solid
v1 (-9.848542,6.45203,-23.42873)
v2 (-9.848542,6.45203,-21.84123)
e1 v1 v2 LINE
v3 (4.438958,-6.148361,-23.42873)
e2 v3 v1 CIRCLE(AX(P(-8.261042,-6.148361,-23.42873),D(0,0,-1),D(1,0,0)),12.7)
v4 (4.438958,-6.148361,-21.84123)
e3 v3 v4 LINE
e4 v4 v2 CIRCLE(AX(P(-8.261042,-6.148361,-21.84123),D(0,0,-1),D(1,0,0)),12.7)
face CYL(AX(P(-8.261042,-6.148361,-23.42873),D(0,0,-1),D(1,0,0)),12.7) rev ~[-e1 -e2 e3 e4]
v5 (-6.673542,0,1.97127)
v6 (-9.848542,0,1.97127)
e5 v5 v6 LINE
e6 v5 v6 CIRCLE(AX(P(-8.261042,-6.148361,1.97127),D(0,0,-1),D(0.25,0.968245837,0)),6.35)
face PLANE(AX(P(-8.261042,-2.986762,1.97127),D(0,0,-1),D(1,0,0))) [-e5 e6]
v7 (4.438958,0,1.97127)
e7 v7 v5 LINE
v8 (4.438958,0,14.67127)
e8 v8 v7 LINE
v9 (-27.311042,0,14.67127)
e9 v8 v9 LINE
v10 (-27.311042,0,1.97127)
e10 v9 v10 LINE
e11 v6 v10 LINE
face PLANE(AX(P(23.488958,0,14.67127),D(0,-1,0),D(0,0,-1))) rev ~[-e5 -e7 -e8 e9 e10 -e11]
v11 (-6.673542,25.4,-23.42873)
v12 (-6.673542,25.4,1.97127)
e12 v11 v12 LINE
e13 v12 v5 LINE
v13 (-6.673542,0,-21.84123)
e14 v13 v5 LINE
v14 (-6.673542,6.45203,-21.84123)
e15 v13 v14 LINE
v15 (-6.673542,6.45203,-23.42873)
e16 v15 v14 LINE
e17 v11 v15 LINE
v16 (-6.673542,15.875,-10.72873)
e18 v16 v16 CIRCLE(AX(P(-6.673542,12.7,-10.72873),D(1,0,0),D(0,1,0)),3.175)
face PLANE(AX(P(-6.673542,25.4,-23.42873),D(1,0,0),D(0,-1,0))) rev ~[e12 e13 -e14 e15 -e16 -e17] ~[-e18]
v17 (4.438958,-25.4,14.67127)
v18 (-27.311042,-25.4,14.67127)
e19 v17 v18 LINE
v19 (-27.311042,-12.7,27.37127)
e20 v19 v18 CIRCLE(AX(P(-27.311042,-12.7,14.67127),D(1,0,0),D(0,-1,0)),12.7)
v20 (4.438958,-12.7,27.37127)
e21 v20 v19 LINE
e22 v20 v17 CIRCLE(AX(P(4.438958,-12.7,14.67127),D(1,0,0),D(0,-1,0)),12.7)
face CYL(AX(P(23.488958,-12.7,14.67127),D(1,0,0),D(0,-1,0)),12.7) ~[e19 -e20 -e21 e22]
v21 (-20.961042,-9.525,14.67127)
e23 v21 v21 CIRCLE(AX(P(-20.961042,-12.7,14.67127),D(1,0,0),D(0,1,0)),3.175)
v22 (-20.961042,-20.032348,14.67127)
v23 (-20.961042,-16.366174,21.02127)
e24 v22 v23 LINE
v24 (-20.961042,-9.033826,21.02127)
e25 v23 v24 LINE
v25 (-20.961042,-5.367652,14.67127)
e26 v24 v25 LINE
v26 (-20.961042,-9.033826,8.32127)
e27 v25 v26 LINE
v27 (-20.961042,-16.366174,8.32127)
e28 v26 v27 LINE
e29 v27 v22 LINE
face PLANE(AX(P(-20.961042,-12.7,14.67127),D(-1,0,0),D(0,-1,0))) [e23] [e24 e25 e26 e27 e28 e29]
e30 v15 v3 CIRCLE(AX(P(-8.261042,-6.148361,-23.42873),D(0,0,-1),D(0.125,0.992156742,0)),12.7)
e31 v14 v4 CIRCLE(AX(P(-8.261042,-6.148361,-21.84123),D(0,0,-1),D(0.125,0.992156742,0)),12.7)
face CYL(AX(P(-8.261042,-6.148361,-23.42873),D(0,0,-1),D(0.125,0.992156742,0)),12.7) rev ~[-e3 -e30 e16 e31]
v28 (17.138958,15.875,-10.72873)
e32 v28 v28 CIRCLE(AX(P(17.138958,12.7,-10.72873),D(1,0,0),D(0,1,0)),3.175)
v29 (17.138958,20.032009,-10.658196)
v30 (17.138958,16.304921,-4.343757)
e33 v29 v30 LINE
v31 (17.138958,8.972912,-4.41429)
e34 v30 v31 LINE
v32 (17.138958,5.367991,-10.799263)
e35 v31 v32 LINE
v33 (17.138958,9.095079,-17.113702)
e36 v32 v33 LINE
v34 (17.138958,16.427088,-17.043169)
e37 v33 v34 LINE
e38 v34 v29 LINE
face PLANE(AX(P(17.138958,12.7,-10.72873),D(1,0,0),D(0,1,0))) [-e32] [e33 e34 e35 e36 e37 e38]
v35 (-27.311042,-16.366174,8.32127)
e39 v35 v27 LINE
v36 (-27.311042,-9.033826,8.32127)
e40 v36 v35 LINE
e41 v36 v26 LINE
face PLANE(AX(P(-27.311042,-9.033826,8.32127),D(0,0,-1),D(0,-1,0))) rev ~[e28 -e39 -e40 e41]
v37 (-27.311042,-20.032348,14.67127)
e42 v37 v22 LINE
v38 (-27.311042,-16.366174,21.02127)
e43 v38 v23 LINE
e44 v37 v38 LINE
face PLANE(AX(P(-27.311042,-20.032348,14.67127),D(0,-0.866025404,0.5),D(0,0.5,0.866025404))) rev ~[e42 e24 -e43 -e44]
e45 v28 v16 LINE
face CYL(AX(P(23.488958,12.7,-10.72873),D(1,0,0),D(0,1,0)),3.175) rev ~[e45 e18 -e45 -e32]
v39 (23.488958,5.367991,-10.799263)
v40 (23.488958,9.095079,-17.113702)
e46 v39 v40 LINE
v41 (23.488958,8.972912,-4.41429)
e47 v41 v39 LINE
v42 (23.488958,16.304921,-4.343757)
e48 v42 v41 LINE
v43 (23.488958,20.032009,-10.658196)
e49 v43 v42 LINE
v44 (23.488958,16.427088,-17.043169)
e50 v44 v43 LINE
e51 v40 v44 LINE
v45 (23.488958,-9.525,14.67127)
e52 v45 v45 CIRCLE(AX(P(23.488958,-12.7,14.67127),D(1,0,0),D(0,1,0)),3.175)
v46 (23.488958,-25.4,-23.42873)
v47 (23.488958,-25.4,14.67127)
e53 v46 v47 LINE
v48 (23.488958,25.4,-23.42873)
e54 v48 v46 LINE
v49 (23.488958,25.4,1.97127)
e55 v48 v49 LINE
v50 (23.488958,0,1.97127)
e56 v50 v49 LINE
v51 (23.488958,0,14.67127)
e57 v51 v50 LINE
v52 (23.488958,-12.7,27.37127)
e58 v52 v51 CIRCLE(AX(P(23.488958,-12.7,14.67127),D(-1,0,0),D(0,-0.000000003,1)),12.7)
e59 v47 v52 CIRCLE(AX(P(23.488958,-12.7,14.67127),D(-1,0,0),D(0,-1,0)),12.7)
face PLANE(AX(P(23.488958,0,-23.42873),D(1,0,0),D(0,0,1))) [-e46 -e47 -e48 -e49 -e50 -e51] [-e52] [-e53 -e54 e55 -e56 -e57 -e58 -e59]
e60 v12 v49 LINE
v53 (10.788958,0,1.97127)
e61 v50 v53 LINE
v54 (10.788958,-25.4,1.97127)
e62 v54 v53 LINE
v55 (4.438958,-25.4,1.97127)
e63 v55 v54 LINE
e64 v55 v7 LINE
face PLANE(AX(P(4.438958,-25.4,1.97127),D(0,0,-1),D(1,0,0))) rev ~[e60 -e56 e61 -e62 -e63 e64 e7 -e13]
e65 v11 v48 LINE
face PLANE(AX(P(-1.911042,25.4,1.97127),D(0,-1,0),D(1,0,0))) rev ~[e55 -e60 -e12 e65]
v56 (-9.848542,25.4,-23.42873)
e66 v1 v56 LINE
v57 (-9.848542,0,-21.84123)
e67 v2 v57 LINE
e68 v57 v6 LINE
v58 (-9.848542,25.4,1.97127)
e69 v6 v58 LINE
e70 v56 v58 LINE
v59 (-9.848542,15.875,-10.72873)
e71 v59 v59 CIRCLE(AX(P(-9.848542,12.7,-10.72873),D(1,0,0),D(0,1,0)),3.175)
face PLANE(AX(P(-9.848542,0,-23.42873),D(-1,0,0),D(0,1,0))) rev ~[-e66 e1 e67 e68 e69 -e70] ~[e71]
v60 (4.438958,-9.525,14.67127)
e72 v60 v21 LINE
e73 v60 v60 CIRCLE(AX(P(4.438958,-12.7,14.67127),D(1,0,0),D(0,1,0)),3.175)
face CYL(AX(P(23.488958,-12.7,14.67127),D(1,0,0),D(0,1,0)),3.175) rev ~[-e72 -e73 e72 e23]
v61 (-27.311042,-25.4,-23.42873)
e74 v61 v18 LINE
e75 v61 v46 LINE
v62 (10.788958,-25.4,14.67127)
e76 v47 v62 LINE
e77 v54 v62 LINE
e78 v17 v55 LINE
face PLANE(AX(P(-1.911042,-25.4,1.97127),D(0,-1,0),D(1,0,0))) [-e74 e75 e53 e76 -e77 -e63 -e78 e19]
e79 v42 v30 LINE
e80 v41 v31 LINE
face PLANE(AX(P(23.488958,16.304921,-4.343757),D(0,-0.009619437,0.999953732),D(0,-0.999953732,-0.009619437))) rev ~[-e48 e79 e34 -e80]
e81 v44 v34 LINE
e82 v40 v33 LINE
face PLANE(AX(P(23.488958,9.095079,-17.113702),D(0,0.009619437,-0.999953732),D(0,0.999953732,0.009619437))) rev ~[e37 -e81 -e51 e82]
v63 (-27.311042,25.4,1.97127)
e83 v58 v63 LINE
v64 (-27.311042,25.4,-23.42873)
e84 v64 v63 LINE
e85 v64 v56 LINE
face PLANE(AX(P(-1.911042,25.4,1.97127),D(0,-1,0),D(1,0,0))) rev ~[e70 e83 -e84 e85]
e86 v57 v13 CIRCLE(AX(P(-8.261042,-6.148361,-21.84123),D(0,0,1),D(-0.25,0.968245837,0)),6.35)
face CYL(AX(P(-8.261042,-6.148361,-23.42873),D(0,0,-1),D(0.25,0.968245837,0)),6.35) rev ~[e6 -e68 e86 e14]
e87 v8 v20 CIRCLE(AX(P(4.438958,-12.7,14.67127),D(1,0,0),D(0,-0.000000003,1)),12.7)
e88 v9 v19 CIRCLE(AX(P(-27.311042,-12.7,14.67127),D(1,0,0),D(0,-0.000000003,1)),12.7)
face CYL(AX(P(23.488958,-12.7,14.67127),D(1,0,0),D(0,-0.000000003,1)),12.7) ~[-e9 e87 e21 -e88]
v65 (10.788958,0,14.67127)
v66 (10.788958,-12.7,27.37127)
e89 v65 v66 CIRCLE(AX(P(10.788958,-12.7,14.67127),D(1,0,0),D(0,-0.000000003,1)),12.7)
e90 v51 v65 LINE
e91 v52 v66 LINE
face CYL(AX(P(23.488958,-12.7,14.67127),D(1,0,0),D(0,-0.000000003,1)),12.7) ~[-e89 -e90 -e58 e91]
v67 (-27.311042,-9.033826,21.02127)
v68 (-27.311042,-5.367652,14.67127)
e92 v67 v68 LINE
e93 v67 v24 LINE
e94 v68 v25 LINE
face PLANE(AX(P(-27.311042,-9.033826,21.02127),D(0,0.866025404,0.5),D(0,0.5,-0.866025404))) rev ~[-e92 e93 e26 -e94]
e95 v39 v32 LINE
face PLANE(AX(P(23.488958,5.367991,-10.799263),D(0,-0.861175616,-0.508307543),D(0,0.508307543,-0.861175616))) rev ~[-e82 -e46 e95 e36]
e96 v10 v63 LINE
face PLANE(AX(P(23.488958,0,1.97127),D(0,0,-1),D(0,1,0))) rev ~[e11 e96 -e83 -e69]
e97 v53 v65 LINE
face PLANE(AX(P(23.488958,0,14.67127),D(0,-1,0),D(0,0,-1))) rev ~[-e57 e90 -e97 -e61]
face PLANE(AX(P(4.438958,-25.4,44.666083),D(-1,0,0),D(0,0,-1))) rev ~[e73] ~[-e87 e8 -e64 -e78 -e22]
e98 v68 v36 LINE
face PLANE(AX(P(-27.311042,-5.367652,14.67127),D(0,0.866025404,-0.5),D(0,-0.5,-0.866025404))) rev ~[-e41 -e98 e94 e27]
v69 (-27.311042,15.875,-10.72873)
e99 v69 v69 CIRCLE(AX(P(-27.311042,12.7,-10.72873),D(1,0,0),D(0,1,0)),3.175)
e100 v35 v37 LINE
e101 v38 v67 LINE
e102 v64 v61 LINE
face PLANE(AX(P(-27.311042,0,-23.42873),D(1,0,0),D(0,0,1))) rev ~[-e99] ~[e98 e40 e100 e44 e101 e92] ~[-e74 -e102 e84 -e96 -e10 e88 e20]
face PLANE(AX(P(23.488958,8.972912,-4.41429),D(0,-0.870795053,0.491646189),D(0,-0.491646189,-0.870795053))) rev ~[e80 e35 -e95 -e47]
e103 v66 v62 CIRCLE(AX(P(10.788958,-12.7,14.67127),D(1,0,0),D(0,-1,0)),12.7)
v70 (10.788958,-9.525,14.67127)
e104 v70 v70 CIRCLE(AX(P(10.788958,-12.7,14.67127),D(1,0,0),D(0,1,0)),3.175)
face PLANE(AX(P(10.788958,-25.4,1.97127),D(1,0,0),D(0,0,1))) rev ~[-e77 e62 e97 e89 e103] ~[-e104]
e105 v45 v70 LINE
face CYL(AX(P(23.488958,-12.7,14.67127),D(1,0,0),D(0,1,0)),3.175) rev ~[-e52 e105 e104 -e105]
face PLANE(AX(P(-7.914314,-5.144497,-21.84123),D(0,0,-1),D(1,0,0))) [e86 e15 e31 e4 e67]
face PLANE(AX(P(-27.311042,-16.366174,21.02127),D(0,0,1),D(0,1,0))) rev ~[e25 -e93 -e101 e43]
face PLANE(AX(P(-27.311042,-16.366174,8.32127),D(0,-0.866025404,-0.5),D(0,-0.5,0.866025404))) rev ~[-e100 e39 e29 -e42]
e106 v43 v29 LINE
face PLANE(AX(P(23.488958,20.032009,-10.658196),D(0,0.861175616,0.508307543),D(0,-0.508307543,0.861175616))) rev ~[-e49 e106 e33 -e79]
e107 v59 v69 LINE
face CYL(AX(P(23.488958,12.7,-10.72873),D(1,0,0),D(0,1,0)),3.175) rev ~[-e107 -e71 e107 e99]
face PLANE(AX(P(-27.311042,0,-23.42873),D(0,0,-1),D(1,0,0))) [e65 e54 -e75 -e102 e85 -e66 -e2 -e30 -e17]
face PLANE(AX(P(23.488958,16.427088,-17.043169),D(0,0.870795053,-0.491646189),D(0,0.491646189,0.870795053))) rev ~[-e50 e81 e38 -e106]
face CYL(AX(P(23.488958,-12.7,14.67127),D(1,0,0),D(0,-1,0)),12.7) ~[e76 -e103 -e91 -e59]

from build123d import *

# Parameters (mm, degrees)
F0_W      = 50.8
F0_H      = 50.8
F1_DEPTH  = 25.4
F3_DEPTH  = 25.4
F4_R      = 3.175
F5_DEPTH  = 50.801
F6_W      = 6.35
F6_H      = 29.9948125449
F6_H_2    = 12.7
F7_DEPTH  = 50.801
F8_R      = 3.175
F9_DEPTH  = 6.35
F10_DEPTH = 6.35
F11_DEPTH = 1.5875


# Not quite as in the source:
# - a feature names something its author has since deleted; it is built from what else it names


with BuildPart() as f1:
    # F0 (on Front) → F1 (new body, symmetric)
    with BuildSketch(Plane.XZ):
        with Locations((-1.9110422581, 1.9712704602)):
            Rectangle(F0_W, F0_H)
    extrude(amount=F1_DEPTH, both=True)

    # F2 (on face) → F3 (cut)
    with BuildSketch(Plane(origin=(0, 0, -23.4287295398), x_dir=(1, 0, 0), z_dir=(0, 0, -1))):
        with BuildLine():
            Line((-6.6735422581, -6.4520295568), (-6.6735422581, 0))
            ThreePointArc((-6.6735422581, 0), (-8.2610422581, 12.4983610621), (-9.8485422581, 0))
            Line((-9.8485422581, 0), (-9.8485422581, -6.4520295568))
            ThreePointArc((-9.8485422581, -6.4520295568), (-8.2610422581, -6.5516389379), (-6.6735422581, -6.4520295568))
        make_face()
        with BuildLine():
            Line((-6.6735422581, -25.4), (-6.6735422581, -6.4520295568))
            ThreePointArc((-6.6735422581, -6.4520295568), (-8.2610422581, -6.5516389379), (-9.8485422581, -6.4520295568))
            Line((-9.8485422581, -6.4520295568), (-9.8485422581, -25.4))
            Line((-9.8485422581, -25.4), (-6.6735422581, -25.4))
        make_face()
    extrude(amount=-F3_DEPTH, mode=Mode.SUBTRACT)

    # F4 (on face) → F5 (cut, through all)
    with BuildSketch(Plane.YZ.offset(23.4889577419)):
        with BuildLine():
            Line((-25.4, 27.3712704602), (-25.4, 14.6712704602))
            ThreePointArc((-25.4, 14.6712704602), (-21.6802561342, 23.6515265681), (-12.7000000372, 27.3712704602))
            Line((-12.7000000372, 27.3712704602), (-25.4, 27.3712704602))
        make_face()
        with BuildLine():
            Line((0, 14.6712704602), (0, 1.9712704602))
            Line((0, 1.9712704602), (25.4, 1.9712704602))
            Line((25.4, 1.9712704602), (25.4, 27.3712704602))
            Line((25.4, 27.3712704602), (-12.7000000372, 27.3712704602))
            ThreePointArc((-12.7000000372, 27.3712704602), (-3.7197438921, 23.6515265944), (0, 14.6712704602))
        make_face()
        with Locations((-12.7, 14.6712704602)):
            Circle(F4_R)
        with Locations((12.7, -10.7287295398)):
            Circle(F4_R)
    extrude(amount=-F5_DEPTH, mode=Mode.SUBTRACT)

    # F6 (on face) → F7 (cut, through all)
    with BuildSketch(Plane.XZ.offset(25.4)):
        with Locations((7.6139577419, 29.6686767327)):
            Rectangle(F6_W, F6_H)
        with Locations((7.6139577419, 8.3212704602)):
            Rectangle(F6_W, F6_H_2)
    extrude(amount=-F7_DEPTH, mode=Mode.SUBTRACT)

    # F8 (on face) → F9 (cut)
    with BuildSketch(Plane(origin=(-27.3110422581, 0, 0), x_dir=(0, -1, 0), z_dir=(-1, 0, 0))):
        Polygon((9.0338257906, 21.0212704602), (5.3676515813, 14.6712704602), (9.0338257906, 8.3212704602), (16.3661742094, 8.3212704602), (20.0323484187, 14.6712704602), (16.3661742094, 21.0212704602), align=None)
        with Locations((12.7, 14.6712704602)):
            Circle(F8_R, mode=Mode.SUBTRACT)
    extrude(amount=-F9_DEPTH, mode=Mode.SUBTRACT)

    # F4 (on face) → F10 (cut)
    with BuildSketch(Plane.YZ.offset(23.4889577419)):
        Polygon((16.4270880107, -17.0431692056), (20.0320091667, -10.6581964733), (16.3049211559, -4.3437568074), (8.9729119893, -4.414289874), (5.3679908333, -10.7992626063), (9.0950788441, -17.1137022722), align=None)
        with Locations((12.7, -10.7287295398)):
            Circle(F4_R, mode=Mode.SUBTRACT)
    extrude(amount=-F10_DEPTH, mode=Mode.SUBTRACT)

    # F2 (on face) → F11 (cut)
    with BuildSketch(Plane(origin=(0, 0, -23.4287295398), x_dir=(1, 0, 0), z_dir=(0, 0, -1))):
        with BuildLine():
            ThreePointArc((-9.8485422581, 0), (-8.2610422581, 12.4983610621), (-6.6735422581, 0))
            Line((-6.6735422581, 0), (-6.6735422581, -6.4520295568))
            ThreePointArc((-6.6735422581, -6.4520295568), (1.2639577419, -2.2518993505), (4.4389577419, 6.1483610621))
            ThreePointArc((4.4389577419, 6.1483610621), (-16.6613026708, 15.6733610621), (-9.8485422581, -6.4520295568))
            Line((-9.8485422581, -6.4520295568), (-9.8485422581, 0))
        make_face()
    extrude(amount=-F11_DEPTH, mode=Mode.SUBTRACT)


solid = f1.part
